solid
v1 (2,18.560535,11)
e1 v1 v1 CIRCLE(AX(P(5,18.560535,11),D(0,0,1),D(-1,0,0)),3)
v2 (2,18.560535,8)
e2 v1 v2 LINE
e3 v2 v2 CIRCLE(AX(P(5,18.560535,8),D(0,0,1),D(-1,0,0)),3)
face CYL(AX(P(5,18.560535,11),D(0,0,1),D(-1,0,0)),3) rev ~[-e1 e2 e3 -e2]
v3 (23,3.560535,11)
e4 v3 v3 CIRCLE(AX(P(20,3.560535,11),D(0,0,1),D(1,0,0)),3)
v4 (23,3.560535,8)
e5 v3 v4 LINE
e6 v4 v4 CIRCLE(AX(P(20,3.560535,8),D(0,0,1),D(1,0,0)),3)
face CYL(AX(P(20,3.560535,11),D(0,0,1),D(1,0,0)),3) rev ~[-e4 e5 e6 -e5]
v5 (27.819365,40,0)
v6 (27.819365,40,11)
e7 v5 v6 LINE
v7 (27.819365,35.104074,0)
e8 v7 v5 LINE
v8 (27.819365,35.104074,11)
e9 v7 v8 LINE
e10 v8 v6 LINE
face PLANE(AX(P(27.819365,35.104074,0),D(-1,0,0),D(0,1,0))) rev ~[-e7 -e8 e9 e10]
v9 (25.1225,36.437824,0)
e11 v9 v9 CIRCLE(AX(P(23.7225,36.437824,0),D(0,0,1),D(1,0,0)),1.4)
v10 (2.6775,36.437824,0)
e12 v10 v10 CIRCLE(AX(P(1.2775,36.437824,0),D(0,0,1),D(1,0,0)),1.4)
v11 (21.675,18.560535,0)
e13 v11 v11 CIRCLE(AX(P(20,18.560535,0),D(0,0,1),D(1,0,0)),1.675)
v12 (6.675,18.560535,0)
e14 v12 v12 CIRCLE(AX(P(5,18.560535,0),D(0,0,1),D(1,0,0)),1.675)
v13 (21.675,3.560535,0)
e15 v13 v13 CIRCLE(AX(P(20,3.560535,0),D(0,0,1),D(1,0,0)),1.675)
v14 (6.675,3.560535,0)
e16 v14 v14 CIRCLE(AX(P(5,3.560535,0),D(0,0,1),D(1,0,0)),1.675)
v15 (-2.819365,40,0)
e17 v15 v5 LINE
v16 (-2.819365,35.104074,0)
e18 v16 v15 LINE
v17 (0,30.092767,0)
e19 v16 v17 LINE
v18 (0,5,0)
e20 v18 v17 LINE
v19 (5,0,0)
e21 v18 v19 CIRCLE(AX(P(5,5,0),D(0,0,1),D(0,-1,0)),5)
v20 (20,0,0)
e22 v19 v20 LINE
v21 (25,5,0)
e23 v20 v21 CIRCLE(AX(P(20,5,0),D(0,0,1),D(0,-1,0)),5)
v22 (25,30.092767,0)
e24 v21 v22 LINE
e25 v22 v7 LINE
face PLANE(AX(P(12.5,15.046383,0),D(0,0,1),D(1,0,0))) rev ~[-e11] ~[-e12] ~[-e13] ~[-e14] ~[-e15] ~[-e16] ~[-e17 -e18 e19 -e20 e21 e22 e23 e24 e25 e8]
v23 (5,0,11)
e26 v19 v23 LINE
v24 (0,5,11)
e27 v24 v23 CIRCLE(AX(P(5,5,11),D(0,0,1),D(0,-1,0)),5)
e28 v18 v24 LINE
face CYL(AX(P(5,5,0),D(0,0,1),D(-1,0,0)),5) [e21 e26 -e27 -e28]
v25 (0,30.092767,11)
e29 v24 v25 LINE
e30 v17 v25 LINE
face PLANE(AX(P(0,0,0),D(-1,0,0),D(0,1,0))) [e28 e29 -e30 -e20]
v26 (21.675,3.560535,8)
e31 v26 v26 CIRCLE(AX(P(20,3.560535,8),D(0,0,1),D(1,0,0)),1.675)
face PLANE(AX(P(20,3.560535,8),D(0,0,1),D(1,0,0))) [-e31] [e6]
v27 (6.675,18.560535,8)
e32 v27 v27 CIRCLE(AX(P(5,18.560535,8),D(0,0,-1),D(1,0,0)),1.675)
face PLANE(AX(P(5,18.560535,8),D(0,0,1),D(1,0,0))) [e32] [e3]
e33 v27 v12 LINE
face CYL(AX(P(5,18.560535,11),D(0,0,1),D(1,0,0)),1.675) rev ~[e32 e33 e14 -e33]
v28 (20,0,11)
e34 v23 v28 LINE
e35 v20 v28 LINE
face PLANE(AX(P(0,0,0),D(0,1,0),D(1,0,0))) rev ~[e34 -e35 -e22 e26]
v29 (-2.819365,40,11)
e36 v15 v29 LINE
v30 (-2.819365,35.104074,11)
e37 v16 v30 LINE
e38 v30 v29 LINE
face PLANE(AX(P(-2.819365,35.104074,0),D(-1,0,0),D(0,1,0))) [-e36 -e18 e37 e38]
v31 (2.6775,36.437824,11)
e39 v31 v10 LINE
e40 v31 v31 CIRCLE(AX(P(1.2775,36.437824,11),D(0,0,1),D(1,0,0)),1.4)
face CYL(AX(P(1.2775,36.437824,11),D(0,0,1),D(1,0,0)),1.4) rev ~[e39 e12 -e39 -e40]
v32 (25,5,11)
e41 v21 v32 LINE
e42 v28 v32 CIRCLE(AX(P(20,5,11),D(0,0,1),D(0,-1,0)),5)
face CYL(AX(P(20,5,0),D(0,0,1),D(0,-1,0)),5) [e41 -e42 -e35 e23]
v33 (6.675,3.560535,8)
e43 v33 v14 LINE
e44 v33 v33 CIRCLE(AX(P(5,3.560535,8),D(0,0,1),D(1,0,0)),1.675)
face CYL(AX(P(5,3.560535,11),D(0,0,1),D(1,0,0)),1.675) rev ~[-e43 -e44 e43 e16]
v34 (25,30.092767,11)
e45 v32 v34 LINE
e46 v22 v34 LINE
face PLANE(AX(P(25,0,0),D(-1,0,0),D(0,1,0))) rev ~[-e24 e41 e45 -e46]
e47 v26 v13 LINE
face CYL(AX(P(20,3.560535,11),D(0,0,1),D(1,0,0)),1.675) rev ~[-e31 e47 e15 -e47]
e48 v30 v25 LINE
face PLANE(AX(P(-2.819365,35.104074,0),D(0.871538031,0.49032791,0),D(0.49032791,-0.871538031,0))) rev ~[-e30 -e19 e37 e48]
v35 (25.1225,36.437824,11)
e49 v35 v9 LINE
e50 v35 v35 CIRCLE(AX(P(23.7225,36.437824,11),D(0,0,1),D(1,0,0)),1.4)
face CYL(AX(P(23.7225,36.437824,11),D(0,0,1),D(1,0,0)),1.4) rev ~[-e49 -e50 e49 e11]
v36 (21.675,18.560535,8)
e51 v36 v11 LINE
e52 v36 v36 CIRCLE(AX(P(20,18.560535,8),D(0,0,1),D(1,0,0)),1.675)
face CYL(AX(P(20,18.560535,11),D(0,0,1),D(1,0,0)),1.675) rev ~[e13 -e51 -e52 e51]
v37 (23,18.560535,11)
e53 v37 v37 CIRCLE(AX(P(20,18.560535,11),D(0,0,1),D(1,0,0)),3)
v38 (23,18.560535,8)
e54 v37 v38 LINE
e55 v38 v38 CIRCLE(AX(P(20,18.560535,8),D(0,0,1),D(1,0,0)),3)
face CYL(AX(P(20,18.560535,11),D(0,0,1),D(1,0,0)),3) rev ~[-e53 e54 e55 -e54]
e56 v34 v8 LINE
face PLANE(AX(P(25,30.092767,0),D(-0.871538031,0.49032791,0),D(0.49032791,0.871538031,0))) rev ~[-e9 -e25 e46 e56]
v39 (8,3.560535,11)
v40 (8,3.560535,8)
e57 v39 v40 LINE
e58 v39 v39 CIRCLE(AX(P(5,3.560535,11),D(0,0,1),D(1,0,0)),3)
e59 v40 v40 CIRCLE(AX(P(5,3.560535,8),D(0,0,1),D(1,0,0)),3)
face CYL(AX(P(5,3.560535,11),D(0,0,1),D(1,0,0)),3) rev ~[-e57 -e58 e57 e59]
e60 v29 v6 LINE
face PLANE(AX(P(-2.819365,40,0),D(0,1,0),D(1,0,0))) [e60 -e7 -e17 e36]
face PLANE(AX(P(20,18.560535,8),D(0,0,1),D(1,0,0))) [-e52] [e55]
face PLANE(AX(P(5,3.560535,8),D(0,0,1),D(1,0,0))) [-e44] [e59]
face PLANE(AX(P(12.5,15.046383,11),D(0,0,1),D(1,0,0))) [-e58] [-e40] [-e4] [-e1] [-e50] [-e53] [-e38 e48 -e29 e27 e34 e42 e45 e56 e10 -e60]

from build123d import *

# Parameters (mm, degrees)
F0_W     = 25
F0_H     = 30.0927665085
F0_W_2   = 30.6387297809
F0_H_2   = 4.8959264159
F1_DEPTH = 11
F2_R     = 1.675
F3_DEPTH = 25
F4_R     = 5
F5_DEPTH = 11
F6_R     = 1.4
F7_DEPTH = 11.001
F2_R_2   = 3
F8_DEPTH = 3


# Not quite as in the source:
# - a feature names something its author has since deleted; it is built from what else it names


with BuildPart() as f1:
    # F0 (on Top) → F1 (new body)
    with BuildSketch(Plane.XY):
        with Locations((12.5, 15.0463832542)):
            Rectangle(F0_W, F0_H)
        Polygon((-2.8193648905, 35.1040735841), (0, 30.0927665085), (25, 30.0927665085), (27.8193648905, 35.1040735841), align=None)
        with Locations((12.5, 37.552036792)):
            Rectangle(F0_W_2, F0_H_2)
    extrude(amount=F1_DEPTH)

    # F2 (on face) → F3 (cut)
    with BuildSketch(Plane.XY.offset(11)):
        with BuildLine():
            ThreePointArc((3.325, 18.5605346784), (5, 16.8855346784), (6.675, 18.5605346784))
            ThreePointArc((6.675, 18.5605346784), (5, 20.2355346784), (3.325, 18.5605346784))
        make_face()
        with Locations((20, 18.5605346784)):
            Circle(F2_R)
        with Locations((20, 3.5605346784)):
            Circle(F2_R)
        with Locations((5, 3.5605346784)):
            Circle(F2_R)
    extrude(amount=-F3_DEPTH, mode=Mode.SUBTRACT)

    # F4
    f4_edges = [f1.edges().sort_by_distance(p)[0] for p in [
        (0, 0, 5.5),
        (25, 0, 5.5),
    ]]
    fillet(f4_edges, radius=F4_R)

    # F0 (on Top) → F5 (join)
    with BuildSketch(Plane.XY):
        with Locations((12.5, 37.552036792)):
            Rectangle(F0_W_2, F0_H_2)
        Polygon((-2.8193648905, 35.1040735841), (0, 30.0927665085), (25, 30.0927665085), (27.8193648905, 35.1040735841), align=None)
    extrude(amount=F5_DEPTH)

    # F6 (on face) → F7 (cut, through all)
    with BuildSketch(Plane.XY.offset(11)):
        with Locations((23.7225, 36.4378243685)):
            Circle(F6_R)
        with BuildLine():
            ThreePointArc((-0.1225, 36.4378243685), (1.2775, 35.0378243685), (2.6775, 36.4378243685))
            ThreePointArc((2.6775, 36.4378243685), (1.2775, 37.8378243685), (-0.1225, 36.4378243685))
        make_face()
    extrude(amount=-F7_DEPTH, mode=Mode.SUBTRACT)

    # F2 (on face) → F8 (cut)
    with BuildSketch(Plane.XY.offset(11)):
        with BuildLine():
            ThreePointArc((8, 18.5605346784), (5, 21.5605346784), (2, 18.5605346784))
            ThreePointArc((2, 18.5605346784), (5, 15.5605346784), (8, 18.5605346784))
        make_face()
        with BuildLine():
            ThreePointArc((3.325, 18.5605346784), (5, 20.2355346784), (6.675, 18.5605346784))
            ThreePointArc((6.675, 18.5605346784), (5, 16.8855346784), (3.325, 18.5605346784))
        make_face(mode=Mode.SUBTRACT)
        with Locations((5, 3.5605346784)):
            Circle(F2_R_2)
        with Locations((5, 3.5605346784)):
            Circle(F2_R, mode=Mode.SUBTRACT)
        with Locations((20, 18.5605346784)):
            Circle(F2_R_2)
        with Locations((20, 18.5605346784)):
            Circle(F2_R, mode=Mode.SUBTRACT)
        with Locations((20, 3.5605346784)):
            Circle(F2_R_2)
        with Locations((20, 3.5605346784)):
            Circle(F2_R, mode=Mode.SUBTRACT)
    extrude(amount=-F8_DEPTH, mode=Mode.SUBTRACT)


solid = f1.part
